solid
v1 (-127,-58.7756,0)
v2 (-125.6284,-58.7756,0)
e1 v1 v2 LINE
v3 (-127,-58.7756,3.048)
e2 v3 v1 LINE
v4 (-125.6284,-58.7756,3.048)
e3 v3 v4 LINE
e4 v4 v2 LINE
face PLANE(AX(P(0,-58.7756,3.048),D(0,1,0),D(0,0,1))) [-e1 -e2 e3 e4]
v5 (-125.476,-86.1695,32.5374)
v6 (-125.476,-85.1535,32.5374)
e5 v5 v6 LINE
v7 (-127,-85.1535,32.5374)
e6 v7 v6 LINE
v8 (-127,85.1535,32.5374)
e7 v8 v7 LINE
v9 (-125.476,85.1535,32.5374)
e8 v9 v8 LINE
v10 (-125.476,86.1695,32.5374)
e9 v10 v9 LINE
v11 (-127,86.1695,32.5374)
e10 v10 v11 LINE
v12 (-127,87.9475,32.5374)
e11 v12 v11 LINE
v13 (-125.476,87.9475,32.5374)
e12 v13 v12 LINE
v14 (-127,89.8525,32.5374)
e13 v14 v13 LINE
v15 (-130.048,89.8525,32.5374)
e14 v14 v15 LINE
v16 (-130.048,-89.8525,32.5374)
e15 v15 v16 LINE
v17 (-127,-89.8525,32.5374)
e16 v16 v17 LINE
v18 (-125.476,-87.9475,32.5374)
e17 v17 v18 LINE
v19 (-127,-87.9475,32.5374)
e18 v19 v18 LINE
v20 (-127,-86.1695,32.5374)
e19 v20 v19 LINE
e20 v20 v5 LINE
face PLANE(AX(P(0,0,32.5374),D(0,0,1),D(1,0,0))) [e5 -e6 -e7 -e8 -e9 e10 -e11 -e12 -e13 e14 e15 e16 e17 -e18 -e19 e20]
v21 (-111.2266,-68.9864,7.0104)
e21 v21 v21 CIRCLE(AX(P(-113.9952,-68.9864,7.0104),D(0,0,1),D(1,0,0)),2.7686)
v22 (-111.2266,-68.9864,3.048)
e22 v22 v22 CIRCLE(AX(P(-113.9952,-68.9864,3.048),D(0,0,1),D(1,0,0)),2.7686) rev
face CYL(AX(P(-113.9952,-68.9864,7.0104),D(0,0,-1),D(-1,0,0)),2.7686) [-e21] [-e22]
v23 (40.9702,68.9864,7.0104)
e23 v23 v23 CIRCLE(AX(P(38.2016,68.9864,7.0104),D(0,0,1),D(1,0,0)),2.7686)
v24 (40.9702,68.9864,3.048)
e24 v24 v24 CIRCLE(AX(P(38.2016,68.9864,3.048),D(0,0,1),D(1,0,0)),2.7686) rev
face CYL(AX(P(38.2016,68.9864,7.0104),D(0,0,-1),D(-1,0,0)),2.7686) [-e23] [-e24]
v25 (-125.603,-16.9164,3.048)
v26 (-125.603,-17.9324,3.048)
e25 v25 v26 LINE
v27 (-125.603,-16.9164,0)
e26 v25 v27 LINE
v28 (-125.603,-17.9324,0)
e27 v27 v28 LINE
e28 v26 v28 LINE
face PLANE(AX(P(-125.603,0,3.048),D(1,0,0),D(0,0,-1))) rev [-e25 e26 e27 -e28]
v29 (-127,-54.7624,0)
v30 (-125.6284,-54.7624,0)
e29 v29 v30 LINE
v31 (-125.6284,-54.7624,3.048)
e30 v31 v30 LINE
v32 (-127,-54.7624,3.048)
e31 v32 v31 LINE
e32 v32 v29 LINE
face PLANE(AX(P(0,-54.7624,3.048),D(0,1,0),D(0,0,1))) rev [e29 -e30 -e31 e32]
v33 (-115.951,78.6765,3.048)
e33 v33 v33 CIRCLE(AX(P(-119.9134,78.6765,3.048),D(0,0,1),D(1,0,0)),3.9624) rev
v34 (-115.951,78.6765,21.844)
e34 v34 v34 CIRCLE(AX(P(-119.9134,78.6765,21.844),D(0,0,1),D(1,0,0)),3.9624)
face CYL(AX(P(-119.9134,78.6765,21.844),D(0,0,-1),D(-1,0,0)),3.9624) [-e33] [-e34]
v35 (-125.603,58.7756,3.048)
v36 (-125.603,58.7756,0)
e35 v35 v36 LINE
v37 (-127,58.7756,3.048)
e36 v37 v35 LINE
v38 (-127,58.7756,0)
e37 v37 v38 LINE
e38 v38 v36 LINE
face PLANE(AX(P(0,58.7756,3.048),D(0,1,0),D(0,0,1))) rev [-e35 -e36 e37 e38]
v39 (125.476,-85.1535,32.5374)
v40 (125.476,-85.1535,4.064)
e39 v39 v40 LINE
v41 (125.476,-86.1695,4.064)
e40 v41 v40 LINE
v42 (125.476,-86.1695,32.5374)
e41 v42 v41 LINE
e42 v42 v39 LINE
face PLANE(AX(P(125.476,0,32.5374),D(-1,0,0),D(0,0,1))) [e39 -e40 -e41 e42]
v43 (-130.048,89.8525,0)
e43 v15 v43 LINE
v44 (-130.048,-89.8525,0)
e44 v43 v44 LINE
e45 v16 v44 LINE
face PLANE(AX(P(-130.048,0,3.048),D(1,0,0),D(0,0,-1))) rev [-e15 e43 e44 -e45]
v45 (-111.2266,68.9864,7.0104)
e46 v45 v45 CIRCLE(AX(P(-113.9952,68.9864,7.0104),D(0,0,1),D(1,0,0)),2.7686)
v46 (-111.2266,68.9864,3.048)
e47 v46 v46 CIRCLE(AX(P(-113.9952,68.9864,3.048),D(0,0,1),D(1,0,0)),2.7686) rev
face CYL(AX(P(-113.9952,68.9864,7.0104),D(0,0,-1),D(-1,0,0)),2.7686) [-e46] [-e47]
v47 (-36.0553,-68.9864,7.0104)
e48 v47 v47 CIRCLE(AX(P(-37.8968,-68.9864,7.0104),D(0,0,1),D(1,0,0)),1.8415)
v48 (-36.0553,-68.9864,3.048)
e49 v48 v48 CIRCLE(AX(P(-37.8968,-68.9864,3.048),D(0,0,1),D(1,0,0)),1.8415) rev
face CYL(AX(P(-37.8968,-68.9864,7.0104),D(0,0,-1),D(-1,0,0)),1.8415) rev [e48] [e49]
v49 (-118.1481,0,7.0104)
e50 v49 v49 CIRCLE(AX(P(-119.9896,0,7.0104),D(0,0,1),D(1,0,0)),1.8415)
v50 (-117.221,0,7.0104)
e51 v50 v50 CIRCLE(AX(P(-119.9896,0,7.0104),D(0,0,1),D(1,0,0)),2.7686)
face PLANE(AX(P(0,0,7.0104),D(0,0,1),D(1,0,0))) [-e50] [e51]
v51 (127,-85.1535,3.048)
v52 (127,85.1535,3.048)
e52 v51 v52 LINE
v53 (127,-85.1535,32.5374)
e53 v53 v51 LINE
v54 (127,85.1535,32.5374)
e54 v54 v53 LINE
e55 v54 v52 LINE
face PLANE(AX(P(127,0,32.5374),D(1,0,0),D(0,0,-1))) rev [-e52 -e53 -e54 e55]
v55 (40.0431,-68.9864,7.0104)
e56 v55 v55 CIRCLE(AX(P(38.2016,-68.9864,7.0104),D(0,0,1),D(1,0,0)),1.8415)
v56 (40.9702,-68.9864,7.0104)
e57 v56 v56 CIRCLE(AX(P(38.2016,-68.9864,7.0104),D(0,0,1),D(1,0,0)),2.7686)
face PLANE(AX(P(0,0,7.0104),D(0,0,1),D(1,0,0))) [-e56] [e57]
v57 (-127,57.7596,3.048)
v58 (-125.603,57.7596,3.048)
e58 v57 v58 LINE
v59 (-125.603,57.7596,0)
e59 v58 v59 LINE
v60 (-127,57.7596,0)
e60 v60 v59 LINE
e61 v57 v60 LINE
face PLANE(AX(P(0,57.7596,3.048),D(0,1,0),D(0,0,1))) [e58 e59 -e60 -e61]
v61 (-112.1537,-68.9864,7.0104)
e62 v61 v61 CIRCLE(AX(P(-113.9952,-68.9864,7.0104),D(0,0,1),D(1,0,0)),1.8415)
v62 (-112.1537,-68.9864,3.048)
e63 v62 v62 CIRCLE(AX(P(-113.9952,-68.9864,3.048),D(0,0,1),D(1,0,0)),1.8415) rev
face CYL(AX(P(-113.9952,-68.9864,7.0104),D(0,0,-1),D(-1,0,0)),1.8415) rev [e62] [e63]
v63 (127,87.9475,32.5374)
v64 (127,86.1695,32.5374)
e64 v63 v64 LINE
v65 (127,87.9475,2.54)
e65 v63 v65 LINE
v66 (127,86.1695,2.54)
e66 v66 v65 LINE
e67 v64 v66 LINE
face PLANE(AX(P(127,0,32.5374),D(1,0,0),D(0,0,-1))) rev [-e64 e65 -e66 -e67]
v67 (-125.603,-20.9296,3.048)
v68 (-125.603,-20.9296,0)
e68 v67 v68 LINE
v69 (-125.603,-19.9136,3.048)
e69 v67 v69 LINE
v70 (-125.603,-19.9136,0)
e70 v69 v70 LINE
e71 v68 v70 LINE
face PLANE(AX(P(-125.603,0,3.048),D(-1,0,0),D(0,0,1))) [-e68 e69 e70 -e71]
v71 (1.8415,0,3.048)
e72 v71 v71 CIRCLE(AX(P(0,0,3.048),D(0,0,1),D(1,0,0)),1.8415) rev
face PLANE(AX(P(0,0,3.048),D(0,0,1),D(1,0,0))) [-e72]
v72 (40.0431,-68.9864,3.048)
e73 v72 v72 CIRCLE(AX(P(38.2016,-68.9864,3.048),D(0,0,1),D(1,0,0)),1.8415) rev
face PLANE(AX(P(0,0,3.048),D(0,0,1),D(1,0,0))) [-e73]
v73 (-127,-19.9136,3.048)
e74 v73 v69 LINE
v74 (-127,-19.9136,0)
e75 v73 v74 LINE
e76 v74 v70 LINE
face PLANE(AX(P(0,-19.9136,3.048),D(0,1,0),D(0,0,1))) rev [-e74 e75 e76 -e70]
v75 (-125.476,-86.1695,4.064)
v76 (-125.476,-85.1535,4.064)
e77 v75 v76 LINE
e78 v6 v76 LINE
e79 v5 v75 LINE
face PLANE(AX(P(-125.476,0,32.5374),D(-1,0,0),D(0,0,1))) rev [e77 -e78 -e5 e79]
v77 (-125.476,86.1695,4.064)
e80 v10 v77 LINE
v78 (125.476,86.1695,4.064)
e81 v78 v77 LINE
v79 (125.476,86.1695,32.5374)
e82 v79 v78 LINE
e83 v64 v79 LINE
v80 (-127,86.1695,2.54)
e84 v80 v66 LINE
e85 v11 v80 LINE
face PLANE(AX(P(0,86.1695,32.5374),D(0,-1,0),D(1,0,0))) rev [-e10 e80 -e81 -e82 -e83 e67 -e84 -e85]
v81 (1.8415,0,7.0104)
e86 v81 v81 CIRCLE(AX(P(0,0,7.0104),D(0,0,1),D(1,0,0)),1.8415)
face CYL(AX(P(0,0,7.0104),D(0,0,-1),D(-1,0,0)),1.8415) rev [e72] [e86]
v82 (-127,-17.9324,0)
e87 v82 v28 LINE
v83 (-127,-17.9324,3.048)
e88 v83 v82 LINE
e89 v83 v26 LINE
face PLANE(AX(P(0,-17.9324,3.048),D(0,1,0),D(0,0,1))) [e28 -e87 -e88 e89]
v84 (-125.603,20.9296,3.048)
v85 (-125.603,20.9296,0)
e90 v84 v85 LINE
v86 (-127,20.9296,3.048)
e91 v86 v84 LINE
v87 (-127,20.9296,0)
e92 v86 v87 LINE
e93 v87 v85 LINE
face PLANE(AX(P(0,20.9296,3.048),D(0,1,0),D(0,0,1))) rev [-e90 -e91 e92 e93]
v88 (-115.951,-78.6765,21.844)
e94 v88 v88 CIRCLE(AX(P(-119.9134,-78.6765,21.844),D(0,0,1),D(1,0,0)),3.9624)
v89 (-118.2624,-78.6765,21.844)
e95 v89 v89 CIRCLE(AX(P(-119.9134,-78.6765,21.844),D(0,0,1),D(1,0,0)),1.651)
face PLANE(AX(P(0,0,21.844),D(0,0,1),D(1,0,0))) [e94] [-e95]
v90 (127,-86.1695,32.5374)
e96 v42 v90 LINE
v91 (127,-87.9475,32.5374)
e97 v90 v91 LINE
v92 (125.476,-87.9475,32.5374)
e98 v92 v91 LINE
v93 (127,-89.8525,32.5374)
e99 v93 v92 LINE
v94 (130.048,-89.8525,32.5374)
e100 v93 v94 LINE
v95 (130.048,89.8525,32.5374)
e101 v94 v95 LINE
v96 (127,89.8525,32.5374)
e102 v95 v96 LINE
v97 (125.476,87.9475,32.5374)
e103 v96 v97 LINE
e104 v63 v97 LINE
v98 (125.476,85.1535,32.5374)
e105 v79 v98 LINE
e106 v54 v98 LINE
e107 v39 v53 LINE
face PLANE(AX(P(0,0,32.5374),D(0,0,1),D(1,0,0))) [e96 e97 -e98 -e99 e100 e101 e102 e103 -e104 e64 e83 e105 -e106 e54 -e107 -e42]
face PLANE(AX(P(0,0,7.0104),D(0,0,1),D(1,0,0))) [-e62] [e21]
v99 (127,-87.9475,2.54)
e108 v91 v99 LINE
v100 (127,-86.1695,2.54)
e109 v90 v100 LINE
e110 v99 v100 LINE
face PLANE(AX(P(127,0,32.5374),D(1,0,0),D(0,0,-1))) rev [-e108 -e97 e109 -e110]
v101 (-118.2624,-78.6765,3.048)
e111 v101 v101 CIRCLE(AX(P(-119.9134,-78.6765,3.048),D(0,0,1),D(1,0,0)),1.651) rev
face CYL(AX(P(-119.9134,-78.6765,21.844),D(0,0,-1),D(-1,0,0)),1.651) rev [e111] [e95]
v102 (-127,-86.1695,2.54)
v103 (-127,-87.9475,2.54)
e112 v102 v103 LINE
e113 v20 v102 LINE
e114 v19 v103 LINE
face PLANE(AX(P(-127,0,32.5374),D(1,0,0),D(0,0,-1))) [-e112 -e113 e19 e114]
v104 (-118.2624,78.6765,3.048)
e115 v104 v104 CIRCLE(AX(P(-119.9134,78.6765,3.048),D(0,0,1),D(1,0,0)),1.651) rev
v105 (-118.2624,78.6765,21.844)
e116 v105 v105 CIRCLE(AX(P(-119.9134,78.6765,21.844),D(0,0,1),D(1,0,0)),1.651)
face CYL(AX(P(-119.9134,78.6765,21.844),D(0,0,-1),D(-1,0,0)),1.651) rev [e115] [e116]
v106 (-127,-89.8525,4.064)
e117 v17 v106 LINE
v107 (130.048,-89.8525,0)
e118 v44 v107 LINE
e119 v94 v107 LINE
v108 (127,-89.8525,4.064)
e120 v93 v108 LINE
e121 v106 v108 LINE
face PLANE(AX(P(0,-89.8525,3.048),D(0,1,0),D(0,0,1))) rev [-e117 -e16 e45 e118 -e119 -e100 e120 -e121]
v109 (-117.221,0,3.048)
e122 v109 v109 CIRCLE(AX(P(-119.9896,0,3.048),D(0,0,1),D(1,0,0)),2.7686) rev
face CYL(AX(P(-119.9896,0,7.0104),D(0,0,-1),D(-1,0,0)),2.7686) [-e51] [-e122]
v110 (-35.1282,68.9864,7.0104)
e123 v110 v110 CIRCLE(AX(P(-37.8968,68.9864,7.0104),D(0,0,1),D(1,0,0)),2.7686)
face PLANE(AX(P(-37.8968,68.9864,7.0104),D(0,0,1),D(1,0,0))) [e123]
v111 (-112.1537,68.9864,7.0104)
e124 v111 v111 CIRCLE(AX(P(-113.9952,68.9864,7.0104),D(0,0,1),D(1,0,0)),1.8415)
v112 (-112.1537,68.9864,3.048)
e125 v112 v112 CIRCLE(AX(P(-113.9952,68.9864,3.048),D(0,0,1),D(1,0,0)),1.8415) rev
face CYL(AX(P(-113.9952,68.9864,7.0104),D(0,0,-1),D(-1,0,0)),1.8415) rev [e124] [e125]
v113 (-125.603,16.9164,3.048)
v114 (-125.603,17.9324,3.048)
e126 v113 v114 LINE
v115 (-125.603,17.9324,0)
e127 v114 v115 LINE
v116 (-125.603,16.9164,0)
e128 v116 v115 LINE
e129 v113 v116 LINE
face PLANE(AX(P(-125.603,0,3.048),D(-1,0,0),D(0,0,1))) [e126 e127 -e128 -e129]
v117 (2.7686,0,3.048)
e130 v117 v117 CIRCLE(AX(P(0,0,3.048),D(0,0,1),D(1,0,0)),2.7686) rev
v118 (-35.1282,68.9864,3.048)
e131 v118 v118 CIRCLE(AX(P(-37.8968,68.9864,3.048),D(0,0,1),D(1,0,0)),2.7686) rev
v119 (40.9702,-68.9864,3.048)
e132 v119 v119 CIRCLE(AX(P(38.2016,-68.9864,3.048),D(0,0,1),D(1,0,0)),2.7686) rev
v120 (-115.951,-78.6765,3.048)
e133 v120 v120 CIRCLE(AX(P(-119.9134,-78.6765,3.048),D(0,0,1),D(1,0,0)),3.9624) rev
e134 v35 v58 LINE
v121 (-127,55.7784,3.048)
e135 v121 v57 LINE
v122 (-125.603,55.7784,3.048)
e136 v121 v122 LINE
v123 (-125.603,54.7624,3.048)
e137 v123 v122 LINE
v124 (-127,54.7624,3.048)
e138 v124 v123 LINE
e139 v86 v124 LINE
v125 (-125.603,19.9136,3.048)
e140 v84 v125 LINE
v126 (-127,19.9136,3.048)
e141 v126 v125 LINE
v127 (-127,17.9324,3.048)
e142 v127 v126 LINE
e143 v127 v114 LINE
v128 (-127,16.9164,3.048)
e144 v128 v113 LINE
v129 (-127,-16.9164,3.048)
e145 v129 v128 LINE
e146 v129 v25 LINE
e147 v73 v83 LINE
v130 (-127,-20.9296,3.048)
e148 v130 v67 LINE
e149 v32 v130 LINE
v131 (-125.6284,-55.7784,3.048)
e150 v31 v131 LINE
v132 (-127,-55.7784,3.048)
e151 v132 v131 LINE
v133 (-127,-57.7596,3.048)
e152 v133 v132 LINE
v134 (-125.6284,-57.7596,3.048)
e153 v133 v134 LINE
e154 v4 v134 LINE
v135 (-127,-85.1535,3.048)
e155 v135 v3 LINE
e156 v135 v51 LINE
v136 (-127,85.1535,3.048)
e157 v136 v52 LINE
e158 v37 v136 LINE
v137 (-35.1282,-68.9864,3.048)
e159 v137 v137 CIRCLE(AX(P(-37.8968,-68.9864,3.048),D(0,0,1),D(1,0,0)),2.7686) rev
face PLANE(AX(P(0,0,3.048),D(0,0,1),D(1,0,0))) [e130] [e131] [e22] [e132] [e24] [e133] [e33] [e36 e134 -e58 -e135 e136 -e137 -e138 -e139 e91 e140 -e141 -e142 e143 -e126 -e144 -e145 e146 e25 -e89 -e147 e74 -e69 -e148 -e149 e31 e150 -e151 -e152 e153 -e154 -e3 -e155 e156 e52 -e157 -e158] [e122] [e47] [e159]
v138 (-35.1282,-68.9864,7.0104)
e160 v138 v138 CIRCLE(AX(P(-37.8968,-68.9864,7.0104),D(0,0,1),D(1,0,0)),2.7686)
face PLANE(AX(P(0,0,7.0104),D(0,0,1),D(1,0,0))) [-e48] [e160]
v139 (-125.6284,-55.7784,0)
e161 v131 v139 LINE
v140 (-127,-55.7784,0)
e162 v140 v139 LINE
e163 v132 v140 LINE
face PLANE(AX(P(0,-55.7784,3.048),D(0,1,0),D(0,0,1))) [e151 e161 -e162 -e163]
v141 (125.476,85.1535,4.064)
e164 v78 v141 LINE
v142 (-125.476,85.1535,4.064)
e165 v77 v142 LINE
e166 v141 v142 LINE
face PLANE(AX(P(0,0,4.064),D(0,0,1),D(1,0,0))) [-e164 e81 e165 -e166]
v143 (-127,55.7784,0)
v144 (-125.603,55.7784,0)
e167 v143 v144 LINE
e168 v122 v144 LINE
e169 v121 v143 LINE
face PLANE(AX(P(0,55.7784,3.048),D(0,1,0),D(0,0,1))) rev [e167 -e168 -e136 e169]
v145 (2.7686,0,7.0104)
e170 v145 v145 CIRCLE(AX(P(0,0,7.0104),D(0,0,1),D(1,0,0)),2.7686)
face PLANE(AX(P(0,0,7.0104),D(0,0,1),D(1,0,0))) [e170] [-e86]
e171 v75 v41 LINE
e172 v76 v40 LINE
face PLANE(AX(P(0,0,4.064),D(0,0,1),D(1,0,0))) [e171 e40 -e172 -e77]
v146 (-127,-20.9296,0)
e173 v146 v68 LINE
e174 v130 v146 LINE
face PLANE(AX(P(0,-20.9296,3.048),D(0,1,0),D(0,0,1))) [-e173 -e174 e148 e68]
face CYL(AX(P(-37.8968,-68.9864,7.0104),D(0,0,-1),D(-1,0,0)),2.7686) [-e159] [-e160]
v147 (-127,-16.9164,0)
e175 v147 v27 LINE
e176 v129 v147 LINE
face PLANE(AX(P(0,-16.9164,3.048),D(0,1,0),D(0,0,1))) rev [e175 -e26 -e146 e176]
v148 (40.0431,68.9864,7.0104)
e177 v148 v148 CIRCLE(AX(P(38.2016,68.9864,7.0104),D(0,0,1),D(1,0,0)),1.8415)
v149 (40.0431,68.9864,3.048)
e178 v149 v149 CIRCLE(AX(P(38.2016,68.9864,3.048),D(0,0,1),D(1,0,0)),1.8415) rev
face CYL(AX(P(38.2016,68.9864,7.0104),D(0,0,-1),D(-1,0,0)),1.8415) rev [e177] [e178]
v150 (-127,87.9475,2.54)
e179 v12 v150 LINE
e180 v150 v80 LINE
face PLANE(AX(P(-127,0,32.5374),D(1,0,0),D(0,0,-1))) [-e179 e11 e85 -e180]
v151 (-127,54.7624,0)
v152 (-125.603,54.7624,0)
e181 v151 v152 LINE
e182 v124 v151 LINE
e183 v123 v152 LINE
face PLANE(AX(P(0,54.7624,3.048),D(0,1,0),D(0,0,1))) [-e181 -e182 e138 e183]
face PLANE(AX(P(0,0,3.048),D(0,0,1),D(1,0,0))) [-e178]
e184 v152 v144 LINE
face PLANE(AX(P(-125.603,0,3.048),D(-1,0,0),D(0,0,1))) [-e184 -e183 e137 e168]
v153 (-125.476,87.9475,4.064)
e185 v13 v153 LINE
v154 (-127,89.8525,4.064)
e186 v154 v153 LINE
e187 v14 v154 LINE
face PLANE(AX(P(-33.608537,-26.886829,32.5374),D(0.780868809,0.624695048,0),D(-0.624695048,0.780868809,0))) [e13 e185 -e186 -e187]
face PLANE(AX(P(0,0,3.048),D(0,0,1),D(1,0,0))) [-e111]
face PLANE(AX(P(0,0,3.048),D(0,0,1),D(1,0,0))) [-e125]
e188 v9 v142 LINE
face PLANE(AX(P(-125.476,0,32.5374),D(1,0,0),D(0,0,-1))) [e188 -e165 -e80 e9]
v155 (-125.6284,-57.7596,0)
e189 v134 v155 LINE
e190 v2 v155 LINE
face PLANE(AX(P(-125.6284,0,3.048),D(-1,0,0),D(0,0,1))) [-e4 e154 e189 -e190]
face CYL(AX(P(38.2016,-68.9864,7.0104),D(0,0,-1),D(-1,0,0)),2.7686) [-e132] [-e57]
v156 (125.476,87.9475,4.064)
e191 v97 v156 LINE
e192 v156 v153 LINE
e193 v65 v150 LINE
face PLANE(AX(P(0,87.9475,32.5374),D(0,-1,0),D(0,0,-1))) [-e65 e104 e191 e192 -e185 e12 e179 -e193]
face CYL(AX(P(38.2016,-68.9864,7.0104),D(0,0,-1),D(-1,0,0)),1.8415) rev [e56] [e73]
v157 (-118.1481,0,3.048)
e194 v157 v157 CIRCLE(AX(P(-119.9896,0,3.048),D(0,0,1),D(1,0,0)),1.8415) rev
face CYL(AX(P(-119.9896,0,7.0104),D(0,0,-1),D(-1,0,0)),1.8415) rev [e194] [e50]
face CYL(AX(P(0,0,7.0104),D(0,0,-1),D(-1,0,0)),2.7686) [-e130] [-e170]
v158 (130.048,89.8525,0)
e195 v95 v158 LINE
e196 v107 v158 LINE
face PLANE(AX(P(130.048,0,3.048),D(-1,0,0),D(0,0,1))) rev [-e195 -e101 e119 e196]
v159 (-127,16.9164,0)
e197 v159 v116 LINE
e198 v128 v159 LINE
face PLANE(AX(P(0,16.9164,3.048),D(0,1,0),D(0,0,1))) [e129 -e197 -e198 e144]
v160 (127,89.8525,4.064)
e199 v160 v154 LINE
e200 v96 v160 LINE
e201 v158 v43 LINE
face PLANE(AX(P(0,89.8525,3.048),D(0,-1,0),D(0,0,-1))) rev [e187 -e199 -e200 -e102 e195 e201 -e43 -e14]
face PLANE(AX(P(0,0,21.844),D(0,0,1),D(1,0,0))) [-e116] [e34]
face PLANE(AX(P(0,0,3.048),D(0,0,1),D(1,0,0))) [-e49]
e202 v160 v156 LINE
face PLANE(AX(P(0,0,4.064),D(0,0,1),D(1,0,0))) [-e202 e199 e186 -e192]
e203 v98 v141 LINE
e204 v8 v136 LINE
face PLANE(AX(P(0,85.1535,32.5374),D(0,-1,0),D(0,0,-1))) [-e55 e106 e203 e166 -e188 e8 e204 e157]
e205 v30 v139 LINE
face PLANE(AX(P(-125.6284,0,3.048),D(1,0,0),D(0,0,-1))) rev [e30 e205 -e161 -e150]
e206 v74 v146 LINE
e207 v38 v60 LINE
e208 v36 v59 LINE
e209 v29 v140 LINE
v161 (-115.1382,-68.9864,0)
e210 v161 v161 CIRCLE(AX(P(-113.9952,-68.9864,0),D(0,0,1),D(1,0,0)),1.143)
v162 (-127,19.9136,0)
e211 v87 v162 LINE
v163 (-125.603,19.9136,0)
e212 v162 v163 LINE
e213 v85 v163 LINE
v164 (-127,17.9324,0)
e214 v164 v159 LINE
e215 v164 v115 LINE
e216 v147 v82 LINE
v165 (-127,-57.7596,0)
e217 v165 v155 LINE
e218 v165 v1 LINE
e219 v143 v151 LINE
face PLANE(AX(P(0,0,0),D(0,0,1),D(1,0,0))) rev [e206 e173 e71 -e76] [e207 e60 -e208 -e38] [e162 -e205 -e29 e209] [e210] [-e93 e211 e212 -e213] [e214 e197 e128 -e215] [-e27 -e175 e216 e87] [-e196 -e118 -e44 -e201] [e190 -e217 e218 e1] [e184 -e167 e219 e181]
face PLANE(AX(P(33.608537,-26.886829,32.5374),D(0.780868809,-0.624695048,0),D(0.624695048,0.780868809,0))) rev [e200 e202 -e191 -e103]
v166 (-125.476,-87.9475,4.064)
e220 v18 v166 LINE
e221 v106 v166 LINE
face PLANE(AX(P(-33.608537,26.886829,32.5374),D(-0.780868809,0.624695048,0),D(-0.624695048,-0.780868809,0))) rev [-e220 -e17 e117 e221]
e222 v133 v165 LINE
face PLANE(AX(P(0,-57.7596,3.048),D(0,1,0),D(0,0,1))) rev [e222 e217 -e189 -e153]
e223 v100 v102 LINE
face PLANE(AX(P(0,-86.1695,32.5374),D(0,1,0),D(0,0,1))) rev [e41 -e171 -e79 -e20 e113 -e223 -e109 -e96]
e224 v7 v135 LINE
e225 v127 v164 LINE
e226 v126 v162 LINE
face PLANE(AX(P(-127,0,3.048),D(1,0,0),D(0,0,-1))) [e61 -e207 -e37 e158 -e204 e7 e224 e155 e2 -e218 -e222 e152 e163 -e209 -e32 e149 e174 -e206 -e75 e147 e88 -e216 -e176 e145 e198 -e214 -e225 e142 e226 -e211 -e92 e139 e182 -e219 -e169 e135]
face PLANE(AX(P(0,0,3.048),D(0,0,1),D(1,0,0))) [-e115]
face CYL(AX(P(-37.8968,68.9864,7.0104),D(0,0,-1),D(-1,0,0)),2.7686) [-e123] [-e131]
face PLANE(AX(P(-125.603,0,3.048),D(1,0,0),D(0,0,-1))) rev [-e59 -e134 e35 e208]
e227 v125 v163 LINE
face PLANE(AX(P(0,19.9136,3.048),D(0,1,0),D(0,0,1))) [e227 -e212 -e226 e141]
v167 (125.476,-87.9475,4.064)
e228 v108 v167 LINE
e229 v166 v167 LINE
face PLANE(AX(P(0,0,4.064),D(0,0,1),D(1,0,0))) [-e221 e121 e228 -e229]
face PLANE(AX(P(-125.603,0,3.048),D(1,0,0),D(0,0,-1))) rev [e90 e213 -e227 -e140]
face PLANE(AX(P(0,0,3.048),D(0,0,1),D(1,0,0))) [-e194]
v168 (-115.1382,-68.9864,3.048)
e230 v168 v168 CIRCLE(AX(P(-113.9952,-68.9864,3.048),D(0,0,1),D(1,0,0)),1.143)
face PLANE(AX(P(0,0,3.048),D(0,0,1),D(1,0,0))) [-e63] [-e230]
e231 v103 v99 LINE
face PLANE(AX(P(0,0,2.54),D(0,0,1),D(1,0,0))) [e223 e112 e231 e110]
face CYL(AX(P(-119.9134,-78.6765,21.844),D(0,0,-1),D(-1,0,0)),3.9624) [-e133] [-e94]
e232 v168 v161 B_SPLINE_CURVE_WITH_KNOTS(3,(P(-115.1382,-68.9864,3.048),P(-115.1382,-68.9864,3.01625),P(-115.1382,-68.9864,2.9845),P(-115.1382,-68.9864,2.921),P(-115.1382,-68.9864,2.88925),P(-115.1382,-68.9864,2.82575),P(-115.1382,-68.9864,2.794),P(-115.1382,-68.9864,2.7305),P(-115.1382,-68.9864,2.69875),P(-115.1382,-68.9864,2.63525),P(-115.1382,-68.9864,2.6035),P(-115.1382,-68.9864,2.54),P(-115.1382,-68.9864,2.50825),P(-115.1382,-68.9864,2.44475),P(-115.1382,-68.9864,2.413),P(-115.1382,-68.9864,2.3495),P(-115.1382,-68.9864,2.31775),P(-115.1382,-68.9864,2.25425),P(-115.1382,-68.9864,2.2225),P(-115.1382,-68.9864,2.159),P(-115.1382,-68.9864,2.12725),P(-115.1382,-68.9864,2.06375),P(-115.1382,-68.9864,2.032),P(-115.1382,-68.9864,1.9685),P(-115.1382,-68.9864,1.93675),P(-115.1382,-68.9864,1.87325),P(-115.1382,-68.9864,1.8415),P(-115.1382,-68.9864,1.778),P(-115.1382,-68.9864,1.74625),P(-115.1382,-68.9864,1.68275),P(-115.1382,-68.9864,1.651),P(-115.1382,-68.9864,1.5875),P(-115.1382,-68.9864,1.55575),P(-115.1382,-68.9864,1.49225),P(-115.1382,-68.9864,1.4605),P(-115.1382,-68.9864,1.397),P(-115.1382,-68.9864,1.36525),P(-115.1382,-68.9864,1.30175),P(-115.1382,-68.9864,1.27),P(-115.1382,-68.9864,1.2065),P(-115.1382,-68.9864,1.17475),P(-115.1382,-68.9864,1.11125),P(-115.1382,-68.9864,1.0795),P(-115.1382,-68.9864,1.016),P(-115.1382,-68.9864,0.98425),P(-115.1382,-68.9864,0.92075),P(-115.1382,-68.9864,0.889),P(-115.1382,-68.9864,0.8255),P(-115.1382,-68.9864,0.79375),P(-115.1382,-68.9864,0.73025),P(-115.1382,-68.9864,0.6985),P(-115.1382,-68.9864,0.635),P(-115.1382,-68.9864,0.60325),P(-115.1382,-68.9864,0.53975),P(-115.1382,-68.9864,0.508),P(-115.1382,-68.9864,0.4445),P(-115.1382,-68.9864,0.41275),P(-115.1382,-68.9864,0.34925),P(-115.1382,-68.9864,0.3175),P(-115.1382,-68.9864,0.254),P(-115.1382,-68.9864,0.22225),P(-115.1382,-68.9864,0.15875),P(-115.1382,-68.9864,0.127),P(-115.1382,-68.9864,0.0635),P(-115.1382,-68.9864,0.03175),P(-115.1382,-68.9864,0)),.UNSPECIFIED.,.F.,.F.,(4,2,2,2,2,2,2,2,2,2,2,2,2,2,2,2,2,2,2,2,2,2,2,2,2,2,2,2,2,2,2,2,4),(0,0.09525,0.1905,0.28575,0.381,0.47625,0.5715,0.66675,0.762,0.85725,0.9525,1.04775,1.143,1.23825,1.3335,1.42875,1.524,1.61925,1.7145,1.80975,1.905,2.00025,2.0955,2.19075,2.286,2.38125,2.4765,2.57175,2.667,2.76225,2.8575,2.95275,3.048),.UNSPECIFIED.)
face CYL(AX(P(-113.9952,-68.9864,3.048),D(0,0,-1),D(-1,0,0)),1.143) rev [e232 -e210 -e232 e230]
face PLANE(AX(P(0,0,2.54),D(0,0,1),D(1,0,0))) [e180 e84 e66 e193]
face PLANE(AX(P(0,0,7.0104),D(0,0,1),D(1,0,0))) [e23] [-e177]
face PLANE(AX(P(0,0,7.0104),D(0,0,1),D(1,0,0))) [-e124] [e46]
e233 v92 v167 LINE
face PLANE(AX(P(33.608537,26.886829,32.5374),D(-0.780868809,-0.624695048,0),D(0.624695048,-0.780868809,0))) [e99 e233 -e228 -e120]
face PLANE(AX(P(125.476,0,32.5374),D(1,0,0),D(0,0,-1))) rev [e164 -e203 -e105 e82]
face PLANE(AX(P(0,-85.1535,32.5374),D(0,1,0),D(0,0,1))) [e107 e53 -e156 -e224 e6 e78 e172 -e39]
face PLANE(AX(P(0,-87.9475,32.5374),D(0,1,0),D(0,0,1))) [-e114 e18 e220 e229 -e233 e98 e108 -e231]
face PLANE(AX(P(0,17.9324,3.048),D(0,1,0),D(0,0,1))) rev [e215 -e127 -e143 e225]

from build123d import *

# Parameters (mm, degrees)
SKETCH1_W           = 260.096
SKETCH1_H           = 179.705
SKETCH1_W_2         = 1.524
SKETCH1_H_2         = 1.016
SKETCH1_W_3         = 1.3716
SKETCH1_W_4         = 1.397
SKETCH1_R           = 1.143
BOSS_EXTRUDE1_DEPTH = 3.048
BOSS_EXTRUDE2_DEPTH = 32.5374
SKETCH1_6_R         = 2.7686
SKETCH1_6_R_2       = 1.8415
BOSS_EXTRUDE3_DEPTH = 7.0104
SKETCH1_7_W         = 250.952
SKETCH1_7_H         = 1.016
BOSS_EXTRUDE4_DEPTH = 4.064
SKETCH1_8_R         = 3.9624
SKETCH1_8_R_2       = 1.651
BOSS_EXTRUDE5_DEPTH = 21.844
SKETCH3_W           = 254
SKETCH3_H           = 1.778
CUT_EXTRUDE1_DEPTH  = 0.508


with BuildPart() as part:
    # Sketch1 → Boss-Extrude1 (new body)
    with BuildSketch(Plane.XY):
        Rectangle(SKETCH1_W, SKETCH1_H)
        with Locations((-126.238, -85.6615)):
            Rectangle(SKETCH1_W_2, SKETCH1_H_2, mode=Mode.SUBTRACT)
        with Locations((-126.3142, -58.2676)):
            Rectangle(SKETCH1_W_3, SKETCH1_H_2, mode=Mode.SUBTRACT)
        with Locations((-126.3142, -55.2704)):
            Rectangle(SKETCH1_W_3, SKETCH1_H_2, mode=Mode.SUBTRACT)
        with Locations((-126.3015, -20.4216)):
            Rectangle(SKETCH1_W_4, SKETCH1_H_2, mode=Mode.SUBTRACT)
        with Locations((-126.3015, -17.4244)):
            Rectangle(SKETCH1_W_4, SKETCH1_H_2, mode=Mode.SUBTRACT)
        with Locations((-126.3015, 17.4244)):
            Rectangle(SKETCH1_W_4, SKETCH1_H_2, mode=Mode.SUBTRACT)
        with Locations((-126.3015, 20.4216)):
            Rectangle(SKETCH1_W_4, SKETCH1_H_2, mode=Mode.SUBTRACT)
        with Locations((-126.3015, 55.2704)):
            Rectangle(SKETCH1_W_4, SKETCH1_H_2, mode=Mode.SUBTRACT)
        with Locations((-126.3015, 58.2676)):
            Rectangle(SKETCH1_W_4, SKETCH1_H_2, mode=Mode.SUBTRACT)
        with Locations((-113.9952, -68.9864)):
            Circle(SKETCH1_R, mode=Mode.SUBTRACT)
    extrude(amount=BOSS_EXTRUDE1_DEPTH)

    # Sketch1<5> → Boss-Extrude2 (add)
    with BuildSketch(Plane.XY):
        Polygon((-127, 85.1535), (-125.476, 85.1535), (-125.476, 86.1695), (-127, 86.1695), (-127, 87.9475), (-125.476, 87.9475), (-127, 89.8525), (-130.048, 89.8525), (-130.048, -89.8525), (-127, -89.8525), (-125.476, -87.9475), (-127, -87.9475), (-127, -86.1695), (-125.476, -86.1695), (-125.476, -85.1535), (-127, -85.1535), (-127, -58.7756), (-127, -57.7596), (-127, -55.7784), (-127, -54.7624), align=None)
        Polygon((125.476, 86.1695), (125.476, 85.1535), (127, 85.1535), (127, -85.1535), (125.476, -85.1535), (125.476, -86.1695), (127, -86.1695), (127, -87.9475), (125.476, -87.9475), (127, -89.8525), (130.048, -89.8525), (130.048, 89.8525), (127, 89.8525), (125.476, 87.9475), (127, 87.9475), (127, 86.1695), align=None)
    extrude(amount=BOSS_EXTRUDE2_DEPTH)

    # Sketch1<6> → Boss-Extrude3 (add)
    # profile 1 of 8: a face of its own
    with BuildSketch(Plane.XY):
        with Locations((-113.9952, -68.9864)):
            Circle(SKETCH1_6_R)
        with Locations((-113.9952, -68.9864)):
            Circle(SKETCH1_6_R_2, mode=Mode.SUBTRACT)
    # profile 2 of 8: a face of its own
    with BuildSketch(Plane.XY):
        Circle(SKETCH1_6_R)
        Circle(SKETCH1_6_R_2, mode=Mode.SUBTRACT)
    # profile 3 of 8: a face of its own
    with BuildSketch(Plane.XY):
        with Locations((-113.9952, 68.9864)):
            Circle(SKETCH1_6_R)
        with Locations((-113.9952, 68.9864)):
            Circle(SKETCH1_6_R_2, mode=Mode.SUBTRACT)
    # profile 4 of 8: a face of its own
    with BuildSketch(Plane.XY):
        with Locations((-37.8968, -68.9864)):
            Circle(SKETCH1_6_R)
        with Locations((-37.8968, -68.9864)):
            Circle(SKETCH1_6_R_2, mode=Mode.SUBTRACT)
    # profile 5 of 8: a face of its own
    with BuildSketch(Plane.XY):
        with Locations((-37.8968, 68.9864)):
            Circle(SKETCH1_6_R)
    # profile 6 of 8: a face of its own
    with BuildSketch(Plane.XY):
        with Locations((38.2016, -68.9864)):
            Circle(SKETCH1_6_R)
        with Locations((38.2016, -68.9864)):
            Circle(SKETCH1_6_R_2, mode=Mode.SUBTRACT)
    # profile 7 of 8: a face of its own
    with BuildSketch(Plane.XY):
        with Locations((38.2016, 68.9864)):
            Circle(SKETCH1_6_R)
        with Locations((38.2016, 68.9864)):
            Circle(SKETCH1_6_R_2, mode=Mode.SUBTRACT)
    # profile 8 of 8: a face of its own
    with BuildSketch(Plane.XY):
        with Locations((-119.9896, 0)):
            Circle(SKETCH1_6_R)
        with Locations((-119.9896, 0)):
            Circle(SKETCH1_6_R_2, mode=Mode.SUBTRACT)
    extrude(amount=BOSS_EXTRUDE3_DEPTH)

    # Sketch1<7> → Boss-Extrude4 (add)
    with BuildSketch(Plane.XY):
        with Locations((0, 85.6615)):
            Rectangle(SKETCH1_7_W, SKETCH1_7_H)
        Polygon((-127, 89.8525), (-125.476, 87.9475), (125.476, 87.9475), (127, 89.8525), align=None)
        with Locations((0, -85.6615)):
            Rectangle(SKETCH1_7_W, SKETCH1_7_H)
        Polygon((-125.476, -87.9475), (-127, -89.8525), (127, -89.8525), (125.476, -87.9475), align=None)
    extrude(amount=BOSS_EXTRUDE4_DEPTH)

    # Sketch1<8> → Boss-Extrude5 (add)
    # profile 1 of 2: a face of its own
    with BuildSketch(Plane.XY):
        with Locations((-119.9134, -78.6765)):
            Circle(SKETCH1_8_R)
        with Locations((-119.9134, -78.6765)):
            Circle(SKETCH1_8_R_2, mode=Mode.SUBTRACT)
    # profile 2 of 2: a face of its own
    with BuildSketch(Plane.XY):
        with Locations((-119.9134, 78.6765)):
            Circle(SKETCH1_8_R)
        with Locations((-119.9134, 78.6765)):
            Circle(SKETCH1_8_R_2, mode=Mode.SUBTRACT)
    extrude(amount=BOSS_EXTRUDE5_DEPTH)

    # Sketch3 → Cut-Extrude1 (cut)
    with BuildSketch(Plane.XY.offset(3.048)):
        with Locations((0, 87.0585)):
            Rectangle(SKETCH3_W, SKETCH3_H)
        with Locations((0, -87.0585)):
            Rectangle(SKETCH3_W, SKETCH3_H)
    extrude(amount=-CUT_EXTRUDE1_DEPTH, mode=Mode.SUBTRACT)


solid = part.part
